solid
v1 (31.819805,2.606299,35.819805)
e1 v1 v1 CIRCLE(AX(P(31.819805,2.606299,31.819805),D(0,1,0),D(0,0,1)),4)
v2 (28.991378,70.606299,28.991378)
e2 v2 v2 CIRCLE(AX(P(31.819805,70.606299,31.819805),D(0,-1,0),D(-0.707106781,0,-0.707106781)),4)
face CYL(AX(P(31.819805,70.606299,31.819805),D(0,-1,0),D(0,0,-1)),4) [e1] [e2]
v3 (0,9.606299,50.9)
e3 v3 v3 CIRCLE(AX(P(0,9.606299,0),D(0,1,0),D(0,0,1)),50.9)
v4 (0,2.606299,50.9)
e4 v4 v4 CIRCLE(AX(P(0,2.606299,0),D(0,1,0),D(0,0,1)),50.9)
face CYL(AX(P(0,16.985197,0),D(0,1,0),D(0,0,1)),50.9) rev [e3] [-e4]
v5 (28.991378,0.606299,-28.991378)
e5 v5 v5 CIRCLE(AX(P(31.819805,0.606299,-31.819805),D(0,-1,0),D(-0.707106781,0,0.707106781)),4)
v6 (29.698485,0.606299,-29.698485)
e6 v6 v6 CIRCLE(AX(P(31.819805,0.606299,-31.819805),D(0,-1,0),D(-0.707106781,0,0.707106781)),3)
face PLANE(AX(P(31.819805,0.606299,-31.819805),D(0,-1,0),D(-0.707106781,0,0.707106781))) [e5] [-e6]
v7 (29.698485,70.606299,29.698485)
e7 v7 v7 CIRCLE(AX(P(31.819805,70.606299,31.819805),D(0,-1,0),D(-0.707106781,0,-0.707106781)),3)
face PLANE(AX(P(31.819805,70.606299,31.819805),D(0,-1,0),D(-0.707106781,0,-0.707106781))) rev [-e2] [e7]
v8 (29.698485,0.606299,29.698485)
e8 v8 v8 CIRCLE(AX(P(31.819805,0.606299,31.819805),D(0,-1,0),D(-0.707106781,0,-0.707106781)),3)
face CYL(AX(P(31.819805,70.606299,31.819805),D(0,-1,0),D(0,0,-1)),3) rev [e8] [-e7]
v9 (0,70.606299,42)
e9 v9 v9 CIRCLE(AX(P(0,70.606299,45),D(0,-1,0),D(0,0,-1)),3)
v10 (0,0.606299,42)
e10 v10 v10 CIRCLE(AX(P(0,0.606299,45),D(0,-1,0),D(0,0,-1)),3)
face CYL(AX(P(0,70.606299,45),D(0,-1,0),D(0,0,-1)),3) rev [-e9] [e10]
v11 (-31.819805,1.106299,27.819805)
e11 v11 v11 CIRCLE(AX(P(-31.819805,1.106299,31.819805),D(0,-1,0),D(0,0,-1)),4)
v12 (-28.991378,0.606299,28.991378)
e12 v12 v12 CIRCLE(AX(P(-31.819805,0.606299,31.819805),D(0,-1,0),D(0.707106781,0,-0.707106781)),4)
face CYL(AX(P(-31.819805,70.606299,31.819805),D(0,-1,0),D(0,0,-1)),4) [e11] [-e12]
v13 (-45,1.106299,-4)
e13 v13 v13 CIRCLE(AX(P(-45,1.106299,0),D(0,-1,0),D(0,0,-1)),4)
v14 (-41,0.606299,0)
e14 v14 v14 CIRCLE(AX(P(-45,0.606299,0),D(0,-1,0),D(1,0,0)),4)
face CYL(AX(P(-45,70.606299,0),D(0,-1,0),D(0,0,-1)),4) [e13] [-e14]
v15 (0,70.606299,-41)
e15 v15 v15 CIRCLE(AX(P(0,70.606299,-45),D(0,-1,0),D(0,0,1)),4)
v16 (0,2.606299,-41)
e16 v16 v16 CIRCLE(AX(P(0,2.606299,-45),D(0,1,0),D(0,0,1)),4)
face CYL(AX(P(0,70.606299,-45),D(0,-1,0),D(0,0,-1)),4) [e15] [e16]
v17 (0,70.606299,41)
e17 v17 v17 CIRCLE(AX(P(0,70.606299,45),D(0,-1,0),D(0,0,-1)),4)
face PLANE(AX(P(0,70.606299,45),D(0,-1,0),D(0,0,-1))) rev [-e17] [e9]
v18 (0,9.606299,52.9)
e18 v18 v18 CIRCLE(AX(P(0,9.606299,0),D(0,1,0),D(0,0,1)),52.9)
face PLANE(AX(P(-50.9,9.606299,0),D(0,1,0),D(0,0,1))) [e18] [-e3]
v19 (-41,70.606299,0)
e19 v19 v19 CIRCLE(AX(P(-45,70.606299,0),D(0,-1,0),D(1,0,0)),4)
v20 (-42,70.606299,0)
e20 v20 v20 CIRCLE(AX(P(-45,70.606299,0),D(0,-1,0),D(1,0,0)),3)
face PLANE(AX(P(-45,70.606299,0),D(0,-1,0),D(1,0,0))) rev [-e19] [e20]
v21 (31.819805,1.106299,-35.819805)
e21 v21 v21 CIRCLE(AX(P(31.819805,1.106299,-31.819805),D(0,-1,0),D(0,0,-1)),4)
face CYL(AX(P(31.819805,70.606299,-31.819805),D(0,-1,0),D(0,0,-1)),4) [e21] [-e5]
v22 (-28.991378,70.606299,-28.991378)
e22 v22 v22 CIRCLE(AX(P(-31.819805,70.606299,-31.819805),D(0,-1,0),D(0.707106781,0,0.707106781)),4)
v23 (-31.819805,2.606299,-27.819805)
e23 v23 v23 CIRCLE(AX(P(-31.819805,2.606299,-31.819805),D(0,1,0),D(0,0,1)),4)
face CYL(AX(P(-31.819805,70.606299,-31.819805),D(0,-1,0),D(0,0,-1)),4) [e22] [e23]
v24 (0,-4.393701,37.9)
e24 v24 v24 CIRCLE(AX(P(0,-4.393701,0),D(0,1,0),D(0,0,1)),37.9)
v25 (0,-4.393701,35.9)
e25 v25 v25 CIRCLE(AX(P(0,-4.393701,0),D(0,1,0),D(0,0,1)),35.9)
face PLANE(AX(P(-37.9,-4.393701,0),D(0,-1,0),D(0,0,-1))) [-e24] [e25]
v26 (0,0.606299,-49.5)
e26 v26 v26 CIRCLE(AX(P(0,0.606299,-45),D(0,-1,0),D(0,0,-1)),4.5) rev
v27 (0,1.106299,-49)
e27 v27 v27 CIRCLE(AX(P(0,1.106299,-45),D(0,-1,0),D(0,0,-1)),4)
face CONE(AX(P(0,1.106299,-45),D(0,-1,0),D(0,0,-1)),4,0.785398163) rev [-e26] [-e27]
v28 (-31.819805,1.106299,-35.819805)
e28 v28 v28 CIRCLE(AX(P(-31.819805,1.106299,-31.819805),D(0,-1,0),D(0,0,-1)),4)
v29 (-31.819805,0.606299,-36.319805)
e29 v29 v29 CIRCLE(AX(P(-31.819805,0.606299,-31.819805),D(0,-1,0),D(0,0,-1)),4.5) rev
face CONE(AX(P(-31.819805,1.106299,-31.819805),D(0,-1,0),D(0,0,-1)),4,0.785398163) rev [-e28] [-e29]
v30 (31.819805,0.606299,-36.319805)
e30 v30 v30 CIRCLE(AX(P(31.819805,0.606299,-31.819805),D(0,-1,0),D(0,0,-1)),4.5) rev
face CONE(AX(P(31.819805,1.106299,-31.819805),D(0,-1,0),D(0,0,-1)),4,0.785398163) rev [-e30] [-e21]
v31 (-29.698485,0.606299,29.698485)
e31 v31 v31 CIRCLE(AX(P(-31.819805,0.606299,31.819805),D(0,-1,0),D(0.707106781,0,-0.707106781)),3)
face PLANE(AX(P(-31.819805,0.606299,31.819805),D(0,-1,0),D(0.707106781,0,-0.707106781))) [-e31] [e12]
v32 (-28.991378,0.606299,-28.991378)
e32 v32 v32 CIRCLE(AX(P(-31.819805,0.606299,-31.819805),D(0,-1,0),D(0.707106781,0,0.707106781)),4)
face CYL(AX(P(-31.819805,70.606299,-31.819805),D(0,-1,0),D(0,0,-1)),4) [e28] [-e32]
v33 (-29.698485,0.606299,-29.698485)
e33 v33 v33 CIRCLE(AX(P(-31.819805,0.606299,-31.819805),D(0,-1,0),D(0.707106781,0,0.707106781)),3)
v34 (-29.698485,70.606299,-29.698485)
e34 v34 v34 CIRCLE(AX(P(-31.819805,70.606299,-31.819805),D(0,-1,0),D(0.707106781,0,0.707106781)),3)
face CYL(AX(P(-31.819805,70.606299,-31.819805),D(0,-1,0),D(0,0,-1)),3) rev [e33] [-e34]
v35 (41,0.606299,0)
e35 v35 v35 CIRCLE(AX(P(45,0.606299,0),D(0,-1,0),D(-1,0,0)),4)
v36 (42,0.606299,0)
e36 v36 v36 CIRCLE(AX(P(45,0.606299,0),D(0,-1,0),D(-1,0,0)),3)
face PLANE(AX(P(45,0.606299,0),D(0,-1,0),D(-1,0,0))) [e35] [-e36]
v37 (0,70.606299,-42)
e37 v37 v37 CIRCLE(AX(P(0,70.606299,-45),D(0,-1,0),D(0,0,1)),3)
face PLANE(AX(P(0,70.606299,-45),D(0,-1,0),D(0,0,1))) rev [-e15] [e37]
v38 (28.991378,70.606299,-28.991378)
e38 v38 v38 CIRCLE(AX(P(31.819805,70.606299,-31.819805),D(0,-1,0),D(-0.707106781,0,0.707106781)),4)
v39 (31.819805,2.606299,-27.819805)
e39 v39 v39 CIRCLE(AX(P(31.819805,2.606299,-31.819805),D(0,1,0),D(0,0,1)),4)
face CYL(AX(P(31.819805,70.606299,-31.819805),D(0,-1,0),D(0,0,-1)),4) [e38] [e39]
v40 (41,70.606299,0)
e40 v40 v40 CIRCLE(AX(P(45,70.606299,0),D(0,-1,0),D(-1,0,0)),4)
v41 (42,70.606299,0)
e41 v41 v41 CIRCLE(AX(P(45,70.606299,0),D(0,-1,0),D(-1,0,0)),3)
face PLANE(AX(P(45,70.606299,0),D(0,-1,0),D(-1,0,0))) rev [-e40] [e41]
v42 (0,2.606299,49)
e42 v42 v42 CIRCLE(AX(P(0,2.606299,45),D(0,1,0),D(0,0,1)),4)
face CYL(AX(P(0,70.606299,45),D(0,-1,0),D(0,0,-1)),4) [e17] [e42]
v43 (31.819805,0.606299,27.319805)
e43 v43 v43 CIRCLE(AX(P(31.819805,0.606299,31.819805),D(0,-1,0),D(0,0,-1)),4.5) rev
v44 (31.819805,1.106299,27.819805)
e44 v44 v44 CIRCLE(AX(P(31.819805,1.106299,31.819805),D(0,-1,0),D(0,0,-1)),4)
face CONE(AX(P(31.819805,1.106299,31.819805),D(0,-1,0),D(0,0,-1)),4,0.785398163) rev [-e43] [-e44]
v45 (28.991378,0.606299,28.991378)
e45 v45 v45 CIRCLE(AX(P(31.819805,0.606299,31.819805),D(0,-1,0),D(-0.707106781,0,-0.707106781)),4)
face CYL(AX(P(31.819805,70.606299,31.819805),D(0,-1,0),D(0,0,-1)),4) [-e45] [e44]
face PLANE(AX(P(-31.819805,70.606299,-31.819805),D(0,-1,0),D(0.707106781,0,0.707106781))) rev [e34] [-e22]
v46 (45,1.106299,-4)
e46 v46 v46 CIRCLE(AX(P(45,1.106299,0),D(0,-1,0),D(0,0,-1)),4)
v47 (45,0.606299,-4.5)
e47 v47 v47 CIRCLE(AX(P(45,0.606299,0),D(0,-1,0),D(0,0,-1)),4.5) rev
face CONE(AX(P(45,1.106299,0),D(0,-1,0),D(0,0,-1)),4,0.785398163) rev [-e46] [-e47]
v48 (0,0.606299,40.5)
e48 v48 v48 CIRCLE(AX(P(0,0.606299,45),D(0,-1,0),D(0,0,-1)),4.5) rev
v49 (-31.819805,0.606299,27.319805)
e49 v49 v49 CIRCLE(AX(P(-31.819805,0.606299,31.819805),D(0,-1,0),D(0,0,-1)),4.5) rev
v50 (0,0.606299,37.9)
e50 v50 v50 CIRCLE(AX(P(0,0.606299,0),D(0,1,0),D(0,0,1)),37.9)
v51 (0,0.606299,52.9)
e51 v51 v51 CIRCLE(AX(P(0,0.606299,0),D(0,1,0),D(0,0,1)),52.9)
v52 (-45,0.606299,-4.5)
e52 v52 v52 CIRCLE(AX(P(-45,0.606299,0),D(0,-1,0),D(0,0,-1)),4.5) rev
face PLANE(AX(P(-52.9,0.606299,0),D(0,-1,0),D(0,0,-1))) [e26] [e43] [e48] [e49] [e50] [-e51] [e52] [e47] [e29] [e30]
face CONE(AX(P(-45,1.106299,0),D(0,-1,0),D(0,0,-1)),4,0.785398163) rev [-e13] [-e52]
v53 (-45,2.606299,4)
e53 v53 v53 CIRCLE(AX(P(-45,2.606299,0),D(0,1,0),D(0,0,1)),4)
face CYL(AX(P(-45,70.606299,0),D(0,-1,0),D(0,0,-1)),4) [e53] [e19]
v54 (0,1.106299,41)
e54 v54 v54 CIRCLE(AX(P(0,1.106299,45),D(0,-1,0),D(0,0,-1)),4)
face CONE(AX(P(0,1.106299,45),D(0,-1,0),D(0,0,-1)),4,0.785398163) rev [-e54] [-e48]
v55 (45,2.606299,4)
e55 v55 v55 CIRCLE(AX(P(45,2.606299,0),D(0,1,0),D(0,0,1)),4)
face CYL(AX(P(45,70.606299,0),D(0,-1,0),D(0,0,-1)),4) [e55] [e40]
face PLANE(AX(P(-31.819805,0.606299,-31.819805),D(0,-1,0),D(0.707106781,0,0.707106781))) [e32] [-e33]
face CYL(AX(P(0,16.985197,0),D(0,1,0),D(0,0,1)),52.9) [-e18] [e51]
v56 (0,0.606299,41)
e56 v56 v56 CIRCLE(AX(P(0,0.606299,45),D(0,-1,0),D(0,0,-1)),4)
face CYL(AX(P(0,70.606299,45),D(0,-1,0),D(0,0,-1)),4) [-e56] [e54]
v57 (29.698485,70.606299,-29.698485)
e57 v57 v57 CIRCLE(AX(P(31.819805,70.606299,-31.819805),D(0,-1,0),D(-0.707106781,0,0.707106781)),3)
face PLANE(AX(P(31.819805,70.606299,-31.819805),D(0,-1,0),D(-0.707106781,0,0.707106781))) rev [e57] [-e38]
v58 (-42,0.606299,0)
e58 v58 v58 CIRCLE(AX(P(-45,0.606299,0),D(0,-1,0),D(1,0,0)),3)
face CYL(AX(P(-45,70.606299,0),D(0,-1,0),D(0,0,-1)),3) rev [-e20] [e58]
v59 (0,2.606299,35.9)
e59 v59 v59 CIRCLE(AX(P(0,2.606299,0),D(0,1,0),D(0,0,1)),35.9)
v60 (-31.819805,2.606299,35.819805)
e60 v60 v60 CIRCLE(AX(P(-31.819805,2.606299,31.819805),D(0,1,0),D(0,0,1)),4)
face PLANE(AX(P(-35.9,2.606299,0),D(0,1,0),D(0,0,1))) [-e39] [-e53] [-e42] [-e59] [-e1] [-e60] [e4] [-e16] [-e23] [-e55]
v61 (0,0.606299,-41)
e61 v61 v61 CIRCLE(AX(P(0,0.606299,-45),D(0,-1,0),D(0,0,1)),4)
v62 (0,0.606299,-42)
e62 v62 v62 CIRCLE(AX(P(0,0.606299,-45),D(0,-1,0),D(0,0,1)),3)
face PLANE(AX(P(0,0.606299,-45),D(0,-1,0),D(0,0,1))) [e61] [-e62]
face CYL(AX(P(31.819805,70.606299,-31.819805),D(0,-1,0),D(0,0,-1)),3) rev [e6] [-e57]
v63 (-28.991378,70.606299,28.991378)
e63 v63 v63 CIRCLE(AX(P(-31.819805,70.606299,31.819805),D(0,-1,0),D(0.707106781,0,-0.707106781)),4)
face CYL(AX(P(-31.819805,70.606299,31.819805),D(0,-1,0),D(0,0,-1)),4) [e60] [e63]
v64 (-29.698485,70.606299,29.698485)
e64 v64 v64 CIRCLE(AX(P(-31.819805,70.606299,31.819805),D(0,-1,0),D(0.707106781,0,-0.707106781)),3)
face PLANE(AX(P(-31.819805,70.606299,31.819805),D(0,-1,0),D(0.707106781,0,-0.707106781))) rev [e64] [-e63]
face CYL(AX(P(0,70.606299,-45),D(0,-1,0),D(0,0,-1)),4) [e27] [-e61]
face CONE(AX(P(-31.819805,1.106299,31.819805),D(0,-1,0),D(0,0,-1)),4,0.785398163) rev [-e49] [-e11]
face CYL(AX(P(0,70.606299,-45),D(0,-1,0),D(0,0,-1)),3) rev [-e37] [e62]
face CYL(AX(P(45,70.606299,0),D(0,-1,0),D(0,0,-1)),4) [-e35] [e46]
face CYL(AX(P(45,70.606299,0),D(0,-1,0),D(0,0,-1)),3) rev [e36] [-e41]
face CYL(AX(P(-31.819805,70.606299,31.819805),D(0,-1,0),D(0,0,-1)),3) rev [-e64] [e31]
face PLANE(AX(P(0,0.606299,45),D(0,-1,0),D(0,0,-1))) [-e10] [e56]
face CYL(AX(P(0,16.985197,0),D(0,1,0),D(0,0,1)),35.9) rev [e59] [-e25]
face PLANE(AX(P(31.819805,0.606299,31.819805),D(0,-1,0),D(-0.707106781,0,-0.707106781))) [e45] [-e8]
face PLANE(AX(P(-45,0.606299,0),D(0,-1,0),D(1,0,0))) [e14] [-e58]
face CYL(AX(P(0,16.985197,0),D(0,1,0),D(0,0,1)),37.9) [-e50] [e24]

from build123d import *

# Parameters (mm, degrees)
IZIM3_R                        = 4
KES_EKSTR_ZYON1_DEPTH          = 10
PAH1_SIZE                      = 0.5
IZIM4_R                        = 4
IZIM4_R_2                      = 3
Y_KSEKLIK_EKSTR_ZYON5_DEPTH    = 70
DAIRESEL_START                 = 2.606299213
DAIRESEL_KAPLAMA15_OUTLINE_R   = 4
DAIRESEL_KAPLAMA15_OUTLINE_R_2 = 3
DAIRESEL_KAPLAMA15_DEPTH       = 68
DAIRESEL_START_2               = 0.606299213
DAIRESEL_KAPLAMA15_2_OUTLINE_R = 3
DAIRESEL_KAPLAMA15_2_DEPTH     = 2


# Read off the part's stored shape, not the designer's step: Dairesel Kaplama15
with BuildPart() as part:
    # Çizim1 → Döndür2 (revolve)
    with BuildSketch(Plane.XY, mode=Mode.PRIVATE) as d_nd_r2_sk:
        Polygon((-52.9, 9.606299213), (-52.9, 0.606299213), (-37.9, 0.606299213), (-37.9, -4.393700787), (-35.9, -4.393700787), (-35.9, 2.606299213), (-50.9, 2.606299213), (-50.9, 9.606299213), align=None)
    revolve(d_nd_r2_sk.sketch.rotate(Axis((0, 16.98519685, 0), (0, -1, 0)), 270), axis=Axis((0, 16.98519685, 0), (0, -1, 0)))

    # Çizim3 → Kes-Ekstrüzyon1 (cut)
    with BuildSketch(Plane.XZ.offset(-0.606299213)):
        with Locations(Location((0, 45, 0), (0, 0, 270))):
            Circle(IZIM3_R)
    extrude(amount=-KES_EKSTR_ZYON1_DEPTH, mode=Mode.SUBTRACT)

    # Pah1
    pah1_edges = [part.edges().sort_by_distance(p)[0] for p in [
        (0, 0.606299213, 49),
    ]]
    chamfer(pah1_edges, length=PAH1_SIZE)

    # Çizim4 → Yükseklik-Ekstrüzyon5 (add)
    with BuildSketch(Plane.XZ.offset(-0.606299213)):
        with Locations(Location((0, 45, 0), (0, 0, 270))):
            Circle(IZIM4_R)
        with Locations(Location((0, 45, 0), (0, 0, 270))):
            Circle(IZIM4_R_2, mode=Mode.SUBTRACT)
    extrude(amount=-Y_KSEKLIK_EKSTR_ZYON5_DEPTH)

    # Dairesel Kaplama15 outline → Dairesel Kaplama15 (add)
    # profile 1 of 7: a face of its own
    with BuildSketch(Plane(origin=(0, 0, 0), x_dir=(1, 0, 0), z_dir=(0, 1, 0)).offset(DAIRESEL_START)):
        with Locations((31.819805153, -31.819805153)):
            Circle(DAIRESEL_KAPLAMA15_OUTLINE_R)
        with Locations((31.819805153, -31.819805153)):
            Circle(DAIRESEL_KAPLAMA15_OUTLINE_R_2, mode=Mode.SUBTRACT)
    # profile 2 of 7: a face of its own
    with BuildSketch(Plane(origin=(0, 0, 0), x_dir=(1, 0, 0), z_dir=(0, 1, 0)).offset(DAIRESEL_START)):
        with Locations((45, 0)):
            Circle(DAIRESEL_KAPLAMA15_OUTLINE_R)
        with Locations((45, 0)):
            Circle(DAIRESEL_KAPLAMA15_OUTLINE_R_2, mode=Mode.SUBTRACT)
    # profile 3 of 7: a face of its own
    with BuildSketch(Plane(origin=(0, 0, 0), x_dir=(1, 0, 0), z_dir=(0, 1, 0)).offset(DAIRESEL_START)):
        with Locations((31.819805153, 31.819805153)):
            Circle(DAIRESEL_KAPLAMA15_OUTLINE_R)
        with Locations((31.819805153, 31.819805153)):
            Circle(DAIRESEL_KAPLAMA15_OUTLINE_R_2, mode=Mode.SUBTRACT)
    # profile 4 of 7: a face of its own
    with BuildSketch(Plane(origin=(0, 0, 0), x_dir=(1, 0, 0), z_dir=(0, 1, 0)).offset(DAIRESEL_START)):
        with Locations((0, 45)):
            Circle(DAIRESEL_KAPLAMA15_OUTLINE_R)
        with Locations((0, 45)):
            Circle(DAIRESEL_KAPLAMA15_OUTLINE_R_2, mode=Mode.SUBTRACT)
    # profile 5 of 7: a face of its own
    with BuildSketch(Plane(origin=(0, 0, 0), x_dir=(1, 0, 0), z_dir=(0, 1, 0)).offset(DAIRESEL_START)):
        with Locations((-31.819805153, 31.819805153)):
            Circle(DAIRESEL_KAPLAMA15_OUTLINE_R)
        with Locations((-31.819805153, 31.819805153)):
            Circle(DAIRESEL_KAPLAMA15_OUTLINE_R_2, mode=Mode.SUBTRACT)
    # profile 6 of 7: a face of its own
    with BuildSketch(Plane(origin=(0, 0, 0), x_dir=(1, 0, 0), z_dir=(0, 1, 0)).offset(DAIRESEL_START)):
        with Locations((-45, 0)):
            Circle(DAIRESEL_KAPLAMA15_OUTLINE_R)
        with Locations((-45, 0)):
            Circle(DAIRESEL_KAPLAMA15_OUTLINE_R_2, mode=Mode.SUBTRACT)
    # profile 7 of 7: a face of its own
    with BuildSketch(Plane(origin=(0, 0, 0), x_dir=(1, 0, 0), z_dir=(0, 1, 0)).offset(DAIRESEL_START)):
        with Locations((-31.819805153, -31.819805153)):
            Circle(DAIRESEL_KAPLAMA15_OUTLINE_R)
        with Locations((-31.819805153, -31.819805153)):
            Circle(DAIRESEL_KAPLAMA15_OUTLINE_R_2, mode=Mode.SUBTRACT)
    extrude(amount=DAIRESEL_KAPLAMA15_DEPTH)

    # Dairesel Kaplama15 2 outline → Dairesel Kaplama15 2 (cut)
    with BuildSketch(Plane(origin=(0, 0, 0), x_dir=(1, 0, 0), z_dir=(0, 1, 0)).offset(DAIRESEL_START_2)):
        with Locations((31.819805153, -31.819805153)):
            Circle(DAIRESEL_KAPLAMA15_2_OUTLINE_R)
        with Locations((45, 0)):
            Circle(DAIRESEL_KAPLAMA15_2_OUTLINE_R)
        with Locations((31.819805153, 31.819805153)):
            Circle(DAIRESEL_KAPLAMA15_2_OUTLINE_R)
        with Locations((0, 45)):
            Circle(DAIRESEL_KAPLAMA15_2_OUTLINE_R)
        with Locations((-31.819805153, 31.819805153)):
            Circle(DAIRESEL_KAPLAMA15_2_OUTLINE_R)
        with Locations((-45, 0)):
            Circle(DAIRESEL_KAPLAMA15_2_OUTLINE_R)
        with Locations((-31.819805153, -31.819805153)):
            Circle(DAIRESEL_KAPLAMA15_2_OUTLINE_R)
    extrude(amount=DAIRESEL_KAPLAMA15_2_DEPTH, mode=Mode.SUBTRACT)

    # Dairesel Kaplama15 3 outline → Dairesel Kaplama15 3 (revolve, cut)
    with BuildSketch(Plane(origin=(31.819805153, 0, 31.819805153), x_dir=(1, 0, 0), z_dir=(0, 0, 1))):
        Polygon((4.5, 0.606299213), (4, 1.106299213), (4, 0.606299213), align=None)
    revolve(axis=Axis((31.819805153, 0, 31.819805153), (0, 1, 0)), mode=Mode.SUBTRACT)

    # Dairesel Kaplama15 4 outline → Dairesel Kaplama15 4 (revolve, cut)
    with BuildSketch(Plane(origin=(45, 0, 0), x_dir=(1, 0, 0), z_dir=(0, 0, 1))):
        Polygon((4.5, 0.606299213), (4, 1.106299213), (4, 0.606299213), align=None)
    revolve(axis=Axis((45, 0, 0), (0, 1, 0)), mode=Mode.SUBTRACT)

    # Dairesel Kaplama15 5 outline → Dairesel Kaplama15 5 (revolve, cut)
    with BuildSketch(Plane(origin=(31.819805153, 0, -31.819805153), x_dir=(1, 0, 0), z_dir=(0, 0, 1))):
        Polygon((4.5, 0.606299213), (4, 1.106299213), (4, 0.606299213), align=None)
    revolve(axis=Axis((31.819805153, 0, -31.819805153), (0, 1, 0)), mode=Mode.SUBTRACT)

    # Dairesel Kaplama15 6 outline → Dairesel Kaplama15 6 (revolve, cut)
    with BuildSketch(Plane.XY.offset(-45)):
        Polygon((4.5, 0.606299213), (4, 1.106299213), (4, 0.606299213), align=None)
    revolve(axis=Axis((0, 0, -45), (0, 1, 0)), mode=Mode.SUBTRACT)

    # Dairesel Kaplama15 7 outline → Dairesel Kaplama15 7 (revolve, cut)
    with BuildSketch(Plane(origin=(-31.819805153, 0, -31.819805153), x_dir=(1, 0, 0), z_dir=(0, 0, 1))):
        Polygon((4.5, 0.606299213), (4, 1.106299213), (4, 0.606299213), align=None)
    revolve(axis=Axis((-31.819805153, 0, -31.819805153), (0, 1, 0)), mode=Mode.SUBTRACT)

    # Dairesel Kaplama15 8 outline → Dairesel Kaplama15 8 (revolve, cut)
    with BuildSketch(Plane(origin=(-45, 0, 0), x_dir=(1, 0, 0), z_dir=(0, 0, 1))):
        Polygon((4.5, 0.606299213), (4, 1.106299213), (4, 0.606299213), align=None)
    revolve(axis=Axis((-45, 0, 0), (0, 1, 0)), mode=Mode.SUBTRACT)

    # Dairesel Kaplama15 9 outline → Dairesel Kaplama15 9 (revolve, cut)
    with BuildSketch(Plane(origin=(-31.819805153, 0, 31.819805153), x_dir=(1, 0, 0), z_dir=(0, 0, 1))):
        Polygon((4.5, 0.606299213), (4, 1.106299213), (4, 0.606299213), align=None)
    revolve(axis=Axis((-31.819805153, 0, 31.819805153), (0, 1, 0)), mode=Mode.SUBTRACT)


solid = part.part
